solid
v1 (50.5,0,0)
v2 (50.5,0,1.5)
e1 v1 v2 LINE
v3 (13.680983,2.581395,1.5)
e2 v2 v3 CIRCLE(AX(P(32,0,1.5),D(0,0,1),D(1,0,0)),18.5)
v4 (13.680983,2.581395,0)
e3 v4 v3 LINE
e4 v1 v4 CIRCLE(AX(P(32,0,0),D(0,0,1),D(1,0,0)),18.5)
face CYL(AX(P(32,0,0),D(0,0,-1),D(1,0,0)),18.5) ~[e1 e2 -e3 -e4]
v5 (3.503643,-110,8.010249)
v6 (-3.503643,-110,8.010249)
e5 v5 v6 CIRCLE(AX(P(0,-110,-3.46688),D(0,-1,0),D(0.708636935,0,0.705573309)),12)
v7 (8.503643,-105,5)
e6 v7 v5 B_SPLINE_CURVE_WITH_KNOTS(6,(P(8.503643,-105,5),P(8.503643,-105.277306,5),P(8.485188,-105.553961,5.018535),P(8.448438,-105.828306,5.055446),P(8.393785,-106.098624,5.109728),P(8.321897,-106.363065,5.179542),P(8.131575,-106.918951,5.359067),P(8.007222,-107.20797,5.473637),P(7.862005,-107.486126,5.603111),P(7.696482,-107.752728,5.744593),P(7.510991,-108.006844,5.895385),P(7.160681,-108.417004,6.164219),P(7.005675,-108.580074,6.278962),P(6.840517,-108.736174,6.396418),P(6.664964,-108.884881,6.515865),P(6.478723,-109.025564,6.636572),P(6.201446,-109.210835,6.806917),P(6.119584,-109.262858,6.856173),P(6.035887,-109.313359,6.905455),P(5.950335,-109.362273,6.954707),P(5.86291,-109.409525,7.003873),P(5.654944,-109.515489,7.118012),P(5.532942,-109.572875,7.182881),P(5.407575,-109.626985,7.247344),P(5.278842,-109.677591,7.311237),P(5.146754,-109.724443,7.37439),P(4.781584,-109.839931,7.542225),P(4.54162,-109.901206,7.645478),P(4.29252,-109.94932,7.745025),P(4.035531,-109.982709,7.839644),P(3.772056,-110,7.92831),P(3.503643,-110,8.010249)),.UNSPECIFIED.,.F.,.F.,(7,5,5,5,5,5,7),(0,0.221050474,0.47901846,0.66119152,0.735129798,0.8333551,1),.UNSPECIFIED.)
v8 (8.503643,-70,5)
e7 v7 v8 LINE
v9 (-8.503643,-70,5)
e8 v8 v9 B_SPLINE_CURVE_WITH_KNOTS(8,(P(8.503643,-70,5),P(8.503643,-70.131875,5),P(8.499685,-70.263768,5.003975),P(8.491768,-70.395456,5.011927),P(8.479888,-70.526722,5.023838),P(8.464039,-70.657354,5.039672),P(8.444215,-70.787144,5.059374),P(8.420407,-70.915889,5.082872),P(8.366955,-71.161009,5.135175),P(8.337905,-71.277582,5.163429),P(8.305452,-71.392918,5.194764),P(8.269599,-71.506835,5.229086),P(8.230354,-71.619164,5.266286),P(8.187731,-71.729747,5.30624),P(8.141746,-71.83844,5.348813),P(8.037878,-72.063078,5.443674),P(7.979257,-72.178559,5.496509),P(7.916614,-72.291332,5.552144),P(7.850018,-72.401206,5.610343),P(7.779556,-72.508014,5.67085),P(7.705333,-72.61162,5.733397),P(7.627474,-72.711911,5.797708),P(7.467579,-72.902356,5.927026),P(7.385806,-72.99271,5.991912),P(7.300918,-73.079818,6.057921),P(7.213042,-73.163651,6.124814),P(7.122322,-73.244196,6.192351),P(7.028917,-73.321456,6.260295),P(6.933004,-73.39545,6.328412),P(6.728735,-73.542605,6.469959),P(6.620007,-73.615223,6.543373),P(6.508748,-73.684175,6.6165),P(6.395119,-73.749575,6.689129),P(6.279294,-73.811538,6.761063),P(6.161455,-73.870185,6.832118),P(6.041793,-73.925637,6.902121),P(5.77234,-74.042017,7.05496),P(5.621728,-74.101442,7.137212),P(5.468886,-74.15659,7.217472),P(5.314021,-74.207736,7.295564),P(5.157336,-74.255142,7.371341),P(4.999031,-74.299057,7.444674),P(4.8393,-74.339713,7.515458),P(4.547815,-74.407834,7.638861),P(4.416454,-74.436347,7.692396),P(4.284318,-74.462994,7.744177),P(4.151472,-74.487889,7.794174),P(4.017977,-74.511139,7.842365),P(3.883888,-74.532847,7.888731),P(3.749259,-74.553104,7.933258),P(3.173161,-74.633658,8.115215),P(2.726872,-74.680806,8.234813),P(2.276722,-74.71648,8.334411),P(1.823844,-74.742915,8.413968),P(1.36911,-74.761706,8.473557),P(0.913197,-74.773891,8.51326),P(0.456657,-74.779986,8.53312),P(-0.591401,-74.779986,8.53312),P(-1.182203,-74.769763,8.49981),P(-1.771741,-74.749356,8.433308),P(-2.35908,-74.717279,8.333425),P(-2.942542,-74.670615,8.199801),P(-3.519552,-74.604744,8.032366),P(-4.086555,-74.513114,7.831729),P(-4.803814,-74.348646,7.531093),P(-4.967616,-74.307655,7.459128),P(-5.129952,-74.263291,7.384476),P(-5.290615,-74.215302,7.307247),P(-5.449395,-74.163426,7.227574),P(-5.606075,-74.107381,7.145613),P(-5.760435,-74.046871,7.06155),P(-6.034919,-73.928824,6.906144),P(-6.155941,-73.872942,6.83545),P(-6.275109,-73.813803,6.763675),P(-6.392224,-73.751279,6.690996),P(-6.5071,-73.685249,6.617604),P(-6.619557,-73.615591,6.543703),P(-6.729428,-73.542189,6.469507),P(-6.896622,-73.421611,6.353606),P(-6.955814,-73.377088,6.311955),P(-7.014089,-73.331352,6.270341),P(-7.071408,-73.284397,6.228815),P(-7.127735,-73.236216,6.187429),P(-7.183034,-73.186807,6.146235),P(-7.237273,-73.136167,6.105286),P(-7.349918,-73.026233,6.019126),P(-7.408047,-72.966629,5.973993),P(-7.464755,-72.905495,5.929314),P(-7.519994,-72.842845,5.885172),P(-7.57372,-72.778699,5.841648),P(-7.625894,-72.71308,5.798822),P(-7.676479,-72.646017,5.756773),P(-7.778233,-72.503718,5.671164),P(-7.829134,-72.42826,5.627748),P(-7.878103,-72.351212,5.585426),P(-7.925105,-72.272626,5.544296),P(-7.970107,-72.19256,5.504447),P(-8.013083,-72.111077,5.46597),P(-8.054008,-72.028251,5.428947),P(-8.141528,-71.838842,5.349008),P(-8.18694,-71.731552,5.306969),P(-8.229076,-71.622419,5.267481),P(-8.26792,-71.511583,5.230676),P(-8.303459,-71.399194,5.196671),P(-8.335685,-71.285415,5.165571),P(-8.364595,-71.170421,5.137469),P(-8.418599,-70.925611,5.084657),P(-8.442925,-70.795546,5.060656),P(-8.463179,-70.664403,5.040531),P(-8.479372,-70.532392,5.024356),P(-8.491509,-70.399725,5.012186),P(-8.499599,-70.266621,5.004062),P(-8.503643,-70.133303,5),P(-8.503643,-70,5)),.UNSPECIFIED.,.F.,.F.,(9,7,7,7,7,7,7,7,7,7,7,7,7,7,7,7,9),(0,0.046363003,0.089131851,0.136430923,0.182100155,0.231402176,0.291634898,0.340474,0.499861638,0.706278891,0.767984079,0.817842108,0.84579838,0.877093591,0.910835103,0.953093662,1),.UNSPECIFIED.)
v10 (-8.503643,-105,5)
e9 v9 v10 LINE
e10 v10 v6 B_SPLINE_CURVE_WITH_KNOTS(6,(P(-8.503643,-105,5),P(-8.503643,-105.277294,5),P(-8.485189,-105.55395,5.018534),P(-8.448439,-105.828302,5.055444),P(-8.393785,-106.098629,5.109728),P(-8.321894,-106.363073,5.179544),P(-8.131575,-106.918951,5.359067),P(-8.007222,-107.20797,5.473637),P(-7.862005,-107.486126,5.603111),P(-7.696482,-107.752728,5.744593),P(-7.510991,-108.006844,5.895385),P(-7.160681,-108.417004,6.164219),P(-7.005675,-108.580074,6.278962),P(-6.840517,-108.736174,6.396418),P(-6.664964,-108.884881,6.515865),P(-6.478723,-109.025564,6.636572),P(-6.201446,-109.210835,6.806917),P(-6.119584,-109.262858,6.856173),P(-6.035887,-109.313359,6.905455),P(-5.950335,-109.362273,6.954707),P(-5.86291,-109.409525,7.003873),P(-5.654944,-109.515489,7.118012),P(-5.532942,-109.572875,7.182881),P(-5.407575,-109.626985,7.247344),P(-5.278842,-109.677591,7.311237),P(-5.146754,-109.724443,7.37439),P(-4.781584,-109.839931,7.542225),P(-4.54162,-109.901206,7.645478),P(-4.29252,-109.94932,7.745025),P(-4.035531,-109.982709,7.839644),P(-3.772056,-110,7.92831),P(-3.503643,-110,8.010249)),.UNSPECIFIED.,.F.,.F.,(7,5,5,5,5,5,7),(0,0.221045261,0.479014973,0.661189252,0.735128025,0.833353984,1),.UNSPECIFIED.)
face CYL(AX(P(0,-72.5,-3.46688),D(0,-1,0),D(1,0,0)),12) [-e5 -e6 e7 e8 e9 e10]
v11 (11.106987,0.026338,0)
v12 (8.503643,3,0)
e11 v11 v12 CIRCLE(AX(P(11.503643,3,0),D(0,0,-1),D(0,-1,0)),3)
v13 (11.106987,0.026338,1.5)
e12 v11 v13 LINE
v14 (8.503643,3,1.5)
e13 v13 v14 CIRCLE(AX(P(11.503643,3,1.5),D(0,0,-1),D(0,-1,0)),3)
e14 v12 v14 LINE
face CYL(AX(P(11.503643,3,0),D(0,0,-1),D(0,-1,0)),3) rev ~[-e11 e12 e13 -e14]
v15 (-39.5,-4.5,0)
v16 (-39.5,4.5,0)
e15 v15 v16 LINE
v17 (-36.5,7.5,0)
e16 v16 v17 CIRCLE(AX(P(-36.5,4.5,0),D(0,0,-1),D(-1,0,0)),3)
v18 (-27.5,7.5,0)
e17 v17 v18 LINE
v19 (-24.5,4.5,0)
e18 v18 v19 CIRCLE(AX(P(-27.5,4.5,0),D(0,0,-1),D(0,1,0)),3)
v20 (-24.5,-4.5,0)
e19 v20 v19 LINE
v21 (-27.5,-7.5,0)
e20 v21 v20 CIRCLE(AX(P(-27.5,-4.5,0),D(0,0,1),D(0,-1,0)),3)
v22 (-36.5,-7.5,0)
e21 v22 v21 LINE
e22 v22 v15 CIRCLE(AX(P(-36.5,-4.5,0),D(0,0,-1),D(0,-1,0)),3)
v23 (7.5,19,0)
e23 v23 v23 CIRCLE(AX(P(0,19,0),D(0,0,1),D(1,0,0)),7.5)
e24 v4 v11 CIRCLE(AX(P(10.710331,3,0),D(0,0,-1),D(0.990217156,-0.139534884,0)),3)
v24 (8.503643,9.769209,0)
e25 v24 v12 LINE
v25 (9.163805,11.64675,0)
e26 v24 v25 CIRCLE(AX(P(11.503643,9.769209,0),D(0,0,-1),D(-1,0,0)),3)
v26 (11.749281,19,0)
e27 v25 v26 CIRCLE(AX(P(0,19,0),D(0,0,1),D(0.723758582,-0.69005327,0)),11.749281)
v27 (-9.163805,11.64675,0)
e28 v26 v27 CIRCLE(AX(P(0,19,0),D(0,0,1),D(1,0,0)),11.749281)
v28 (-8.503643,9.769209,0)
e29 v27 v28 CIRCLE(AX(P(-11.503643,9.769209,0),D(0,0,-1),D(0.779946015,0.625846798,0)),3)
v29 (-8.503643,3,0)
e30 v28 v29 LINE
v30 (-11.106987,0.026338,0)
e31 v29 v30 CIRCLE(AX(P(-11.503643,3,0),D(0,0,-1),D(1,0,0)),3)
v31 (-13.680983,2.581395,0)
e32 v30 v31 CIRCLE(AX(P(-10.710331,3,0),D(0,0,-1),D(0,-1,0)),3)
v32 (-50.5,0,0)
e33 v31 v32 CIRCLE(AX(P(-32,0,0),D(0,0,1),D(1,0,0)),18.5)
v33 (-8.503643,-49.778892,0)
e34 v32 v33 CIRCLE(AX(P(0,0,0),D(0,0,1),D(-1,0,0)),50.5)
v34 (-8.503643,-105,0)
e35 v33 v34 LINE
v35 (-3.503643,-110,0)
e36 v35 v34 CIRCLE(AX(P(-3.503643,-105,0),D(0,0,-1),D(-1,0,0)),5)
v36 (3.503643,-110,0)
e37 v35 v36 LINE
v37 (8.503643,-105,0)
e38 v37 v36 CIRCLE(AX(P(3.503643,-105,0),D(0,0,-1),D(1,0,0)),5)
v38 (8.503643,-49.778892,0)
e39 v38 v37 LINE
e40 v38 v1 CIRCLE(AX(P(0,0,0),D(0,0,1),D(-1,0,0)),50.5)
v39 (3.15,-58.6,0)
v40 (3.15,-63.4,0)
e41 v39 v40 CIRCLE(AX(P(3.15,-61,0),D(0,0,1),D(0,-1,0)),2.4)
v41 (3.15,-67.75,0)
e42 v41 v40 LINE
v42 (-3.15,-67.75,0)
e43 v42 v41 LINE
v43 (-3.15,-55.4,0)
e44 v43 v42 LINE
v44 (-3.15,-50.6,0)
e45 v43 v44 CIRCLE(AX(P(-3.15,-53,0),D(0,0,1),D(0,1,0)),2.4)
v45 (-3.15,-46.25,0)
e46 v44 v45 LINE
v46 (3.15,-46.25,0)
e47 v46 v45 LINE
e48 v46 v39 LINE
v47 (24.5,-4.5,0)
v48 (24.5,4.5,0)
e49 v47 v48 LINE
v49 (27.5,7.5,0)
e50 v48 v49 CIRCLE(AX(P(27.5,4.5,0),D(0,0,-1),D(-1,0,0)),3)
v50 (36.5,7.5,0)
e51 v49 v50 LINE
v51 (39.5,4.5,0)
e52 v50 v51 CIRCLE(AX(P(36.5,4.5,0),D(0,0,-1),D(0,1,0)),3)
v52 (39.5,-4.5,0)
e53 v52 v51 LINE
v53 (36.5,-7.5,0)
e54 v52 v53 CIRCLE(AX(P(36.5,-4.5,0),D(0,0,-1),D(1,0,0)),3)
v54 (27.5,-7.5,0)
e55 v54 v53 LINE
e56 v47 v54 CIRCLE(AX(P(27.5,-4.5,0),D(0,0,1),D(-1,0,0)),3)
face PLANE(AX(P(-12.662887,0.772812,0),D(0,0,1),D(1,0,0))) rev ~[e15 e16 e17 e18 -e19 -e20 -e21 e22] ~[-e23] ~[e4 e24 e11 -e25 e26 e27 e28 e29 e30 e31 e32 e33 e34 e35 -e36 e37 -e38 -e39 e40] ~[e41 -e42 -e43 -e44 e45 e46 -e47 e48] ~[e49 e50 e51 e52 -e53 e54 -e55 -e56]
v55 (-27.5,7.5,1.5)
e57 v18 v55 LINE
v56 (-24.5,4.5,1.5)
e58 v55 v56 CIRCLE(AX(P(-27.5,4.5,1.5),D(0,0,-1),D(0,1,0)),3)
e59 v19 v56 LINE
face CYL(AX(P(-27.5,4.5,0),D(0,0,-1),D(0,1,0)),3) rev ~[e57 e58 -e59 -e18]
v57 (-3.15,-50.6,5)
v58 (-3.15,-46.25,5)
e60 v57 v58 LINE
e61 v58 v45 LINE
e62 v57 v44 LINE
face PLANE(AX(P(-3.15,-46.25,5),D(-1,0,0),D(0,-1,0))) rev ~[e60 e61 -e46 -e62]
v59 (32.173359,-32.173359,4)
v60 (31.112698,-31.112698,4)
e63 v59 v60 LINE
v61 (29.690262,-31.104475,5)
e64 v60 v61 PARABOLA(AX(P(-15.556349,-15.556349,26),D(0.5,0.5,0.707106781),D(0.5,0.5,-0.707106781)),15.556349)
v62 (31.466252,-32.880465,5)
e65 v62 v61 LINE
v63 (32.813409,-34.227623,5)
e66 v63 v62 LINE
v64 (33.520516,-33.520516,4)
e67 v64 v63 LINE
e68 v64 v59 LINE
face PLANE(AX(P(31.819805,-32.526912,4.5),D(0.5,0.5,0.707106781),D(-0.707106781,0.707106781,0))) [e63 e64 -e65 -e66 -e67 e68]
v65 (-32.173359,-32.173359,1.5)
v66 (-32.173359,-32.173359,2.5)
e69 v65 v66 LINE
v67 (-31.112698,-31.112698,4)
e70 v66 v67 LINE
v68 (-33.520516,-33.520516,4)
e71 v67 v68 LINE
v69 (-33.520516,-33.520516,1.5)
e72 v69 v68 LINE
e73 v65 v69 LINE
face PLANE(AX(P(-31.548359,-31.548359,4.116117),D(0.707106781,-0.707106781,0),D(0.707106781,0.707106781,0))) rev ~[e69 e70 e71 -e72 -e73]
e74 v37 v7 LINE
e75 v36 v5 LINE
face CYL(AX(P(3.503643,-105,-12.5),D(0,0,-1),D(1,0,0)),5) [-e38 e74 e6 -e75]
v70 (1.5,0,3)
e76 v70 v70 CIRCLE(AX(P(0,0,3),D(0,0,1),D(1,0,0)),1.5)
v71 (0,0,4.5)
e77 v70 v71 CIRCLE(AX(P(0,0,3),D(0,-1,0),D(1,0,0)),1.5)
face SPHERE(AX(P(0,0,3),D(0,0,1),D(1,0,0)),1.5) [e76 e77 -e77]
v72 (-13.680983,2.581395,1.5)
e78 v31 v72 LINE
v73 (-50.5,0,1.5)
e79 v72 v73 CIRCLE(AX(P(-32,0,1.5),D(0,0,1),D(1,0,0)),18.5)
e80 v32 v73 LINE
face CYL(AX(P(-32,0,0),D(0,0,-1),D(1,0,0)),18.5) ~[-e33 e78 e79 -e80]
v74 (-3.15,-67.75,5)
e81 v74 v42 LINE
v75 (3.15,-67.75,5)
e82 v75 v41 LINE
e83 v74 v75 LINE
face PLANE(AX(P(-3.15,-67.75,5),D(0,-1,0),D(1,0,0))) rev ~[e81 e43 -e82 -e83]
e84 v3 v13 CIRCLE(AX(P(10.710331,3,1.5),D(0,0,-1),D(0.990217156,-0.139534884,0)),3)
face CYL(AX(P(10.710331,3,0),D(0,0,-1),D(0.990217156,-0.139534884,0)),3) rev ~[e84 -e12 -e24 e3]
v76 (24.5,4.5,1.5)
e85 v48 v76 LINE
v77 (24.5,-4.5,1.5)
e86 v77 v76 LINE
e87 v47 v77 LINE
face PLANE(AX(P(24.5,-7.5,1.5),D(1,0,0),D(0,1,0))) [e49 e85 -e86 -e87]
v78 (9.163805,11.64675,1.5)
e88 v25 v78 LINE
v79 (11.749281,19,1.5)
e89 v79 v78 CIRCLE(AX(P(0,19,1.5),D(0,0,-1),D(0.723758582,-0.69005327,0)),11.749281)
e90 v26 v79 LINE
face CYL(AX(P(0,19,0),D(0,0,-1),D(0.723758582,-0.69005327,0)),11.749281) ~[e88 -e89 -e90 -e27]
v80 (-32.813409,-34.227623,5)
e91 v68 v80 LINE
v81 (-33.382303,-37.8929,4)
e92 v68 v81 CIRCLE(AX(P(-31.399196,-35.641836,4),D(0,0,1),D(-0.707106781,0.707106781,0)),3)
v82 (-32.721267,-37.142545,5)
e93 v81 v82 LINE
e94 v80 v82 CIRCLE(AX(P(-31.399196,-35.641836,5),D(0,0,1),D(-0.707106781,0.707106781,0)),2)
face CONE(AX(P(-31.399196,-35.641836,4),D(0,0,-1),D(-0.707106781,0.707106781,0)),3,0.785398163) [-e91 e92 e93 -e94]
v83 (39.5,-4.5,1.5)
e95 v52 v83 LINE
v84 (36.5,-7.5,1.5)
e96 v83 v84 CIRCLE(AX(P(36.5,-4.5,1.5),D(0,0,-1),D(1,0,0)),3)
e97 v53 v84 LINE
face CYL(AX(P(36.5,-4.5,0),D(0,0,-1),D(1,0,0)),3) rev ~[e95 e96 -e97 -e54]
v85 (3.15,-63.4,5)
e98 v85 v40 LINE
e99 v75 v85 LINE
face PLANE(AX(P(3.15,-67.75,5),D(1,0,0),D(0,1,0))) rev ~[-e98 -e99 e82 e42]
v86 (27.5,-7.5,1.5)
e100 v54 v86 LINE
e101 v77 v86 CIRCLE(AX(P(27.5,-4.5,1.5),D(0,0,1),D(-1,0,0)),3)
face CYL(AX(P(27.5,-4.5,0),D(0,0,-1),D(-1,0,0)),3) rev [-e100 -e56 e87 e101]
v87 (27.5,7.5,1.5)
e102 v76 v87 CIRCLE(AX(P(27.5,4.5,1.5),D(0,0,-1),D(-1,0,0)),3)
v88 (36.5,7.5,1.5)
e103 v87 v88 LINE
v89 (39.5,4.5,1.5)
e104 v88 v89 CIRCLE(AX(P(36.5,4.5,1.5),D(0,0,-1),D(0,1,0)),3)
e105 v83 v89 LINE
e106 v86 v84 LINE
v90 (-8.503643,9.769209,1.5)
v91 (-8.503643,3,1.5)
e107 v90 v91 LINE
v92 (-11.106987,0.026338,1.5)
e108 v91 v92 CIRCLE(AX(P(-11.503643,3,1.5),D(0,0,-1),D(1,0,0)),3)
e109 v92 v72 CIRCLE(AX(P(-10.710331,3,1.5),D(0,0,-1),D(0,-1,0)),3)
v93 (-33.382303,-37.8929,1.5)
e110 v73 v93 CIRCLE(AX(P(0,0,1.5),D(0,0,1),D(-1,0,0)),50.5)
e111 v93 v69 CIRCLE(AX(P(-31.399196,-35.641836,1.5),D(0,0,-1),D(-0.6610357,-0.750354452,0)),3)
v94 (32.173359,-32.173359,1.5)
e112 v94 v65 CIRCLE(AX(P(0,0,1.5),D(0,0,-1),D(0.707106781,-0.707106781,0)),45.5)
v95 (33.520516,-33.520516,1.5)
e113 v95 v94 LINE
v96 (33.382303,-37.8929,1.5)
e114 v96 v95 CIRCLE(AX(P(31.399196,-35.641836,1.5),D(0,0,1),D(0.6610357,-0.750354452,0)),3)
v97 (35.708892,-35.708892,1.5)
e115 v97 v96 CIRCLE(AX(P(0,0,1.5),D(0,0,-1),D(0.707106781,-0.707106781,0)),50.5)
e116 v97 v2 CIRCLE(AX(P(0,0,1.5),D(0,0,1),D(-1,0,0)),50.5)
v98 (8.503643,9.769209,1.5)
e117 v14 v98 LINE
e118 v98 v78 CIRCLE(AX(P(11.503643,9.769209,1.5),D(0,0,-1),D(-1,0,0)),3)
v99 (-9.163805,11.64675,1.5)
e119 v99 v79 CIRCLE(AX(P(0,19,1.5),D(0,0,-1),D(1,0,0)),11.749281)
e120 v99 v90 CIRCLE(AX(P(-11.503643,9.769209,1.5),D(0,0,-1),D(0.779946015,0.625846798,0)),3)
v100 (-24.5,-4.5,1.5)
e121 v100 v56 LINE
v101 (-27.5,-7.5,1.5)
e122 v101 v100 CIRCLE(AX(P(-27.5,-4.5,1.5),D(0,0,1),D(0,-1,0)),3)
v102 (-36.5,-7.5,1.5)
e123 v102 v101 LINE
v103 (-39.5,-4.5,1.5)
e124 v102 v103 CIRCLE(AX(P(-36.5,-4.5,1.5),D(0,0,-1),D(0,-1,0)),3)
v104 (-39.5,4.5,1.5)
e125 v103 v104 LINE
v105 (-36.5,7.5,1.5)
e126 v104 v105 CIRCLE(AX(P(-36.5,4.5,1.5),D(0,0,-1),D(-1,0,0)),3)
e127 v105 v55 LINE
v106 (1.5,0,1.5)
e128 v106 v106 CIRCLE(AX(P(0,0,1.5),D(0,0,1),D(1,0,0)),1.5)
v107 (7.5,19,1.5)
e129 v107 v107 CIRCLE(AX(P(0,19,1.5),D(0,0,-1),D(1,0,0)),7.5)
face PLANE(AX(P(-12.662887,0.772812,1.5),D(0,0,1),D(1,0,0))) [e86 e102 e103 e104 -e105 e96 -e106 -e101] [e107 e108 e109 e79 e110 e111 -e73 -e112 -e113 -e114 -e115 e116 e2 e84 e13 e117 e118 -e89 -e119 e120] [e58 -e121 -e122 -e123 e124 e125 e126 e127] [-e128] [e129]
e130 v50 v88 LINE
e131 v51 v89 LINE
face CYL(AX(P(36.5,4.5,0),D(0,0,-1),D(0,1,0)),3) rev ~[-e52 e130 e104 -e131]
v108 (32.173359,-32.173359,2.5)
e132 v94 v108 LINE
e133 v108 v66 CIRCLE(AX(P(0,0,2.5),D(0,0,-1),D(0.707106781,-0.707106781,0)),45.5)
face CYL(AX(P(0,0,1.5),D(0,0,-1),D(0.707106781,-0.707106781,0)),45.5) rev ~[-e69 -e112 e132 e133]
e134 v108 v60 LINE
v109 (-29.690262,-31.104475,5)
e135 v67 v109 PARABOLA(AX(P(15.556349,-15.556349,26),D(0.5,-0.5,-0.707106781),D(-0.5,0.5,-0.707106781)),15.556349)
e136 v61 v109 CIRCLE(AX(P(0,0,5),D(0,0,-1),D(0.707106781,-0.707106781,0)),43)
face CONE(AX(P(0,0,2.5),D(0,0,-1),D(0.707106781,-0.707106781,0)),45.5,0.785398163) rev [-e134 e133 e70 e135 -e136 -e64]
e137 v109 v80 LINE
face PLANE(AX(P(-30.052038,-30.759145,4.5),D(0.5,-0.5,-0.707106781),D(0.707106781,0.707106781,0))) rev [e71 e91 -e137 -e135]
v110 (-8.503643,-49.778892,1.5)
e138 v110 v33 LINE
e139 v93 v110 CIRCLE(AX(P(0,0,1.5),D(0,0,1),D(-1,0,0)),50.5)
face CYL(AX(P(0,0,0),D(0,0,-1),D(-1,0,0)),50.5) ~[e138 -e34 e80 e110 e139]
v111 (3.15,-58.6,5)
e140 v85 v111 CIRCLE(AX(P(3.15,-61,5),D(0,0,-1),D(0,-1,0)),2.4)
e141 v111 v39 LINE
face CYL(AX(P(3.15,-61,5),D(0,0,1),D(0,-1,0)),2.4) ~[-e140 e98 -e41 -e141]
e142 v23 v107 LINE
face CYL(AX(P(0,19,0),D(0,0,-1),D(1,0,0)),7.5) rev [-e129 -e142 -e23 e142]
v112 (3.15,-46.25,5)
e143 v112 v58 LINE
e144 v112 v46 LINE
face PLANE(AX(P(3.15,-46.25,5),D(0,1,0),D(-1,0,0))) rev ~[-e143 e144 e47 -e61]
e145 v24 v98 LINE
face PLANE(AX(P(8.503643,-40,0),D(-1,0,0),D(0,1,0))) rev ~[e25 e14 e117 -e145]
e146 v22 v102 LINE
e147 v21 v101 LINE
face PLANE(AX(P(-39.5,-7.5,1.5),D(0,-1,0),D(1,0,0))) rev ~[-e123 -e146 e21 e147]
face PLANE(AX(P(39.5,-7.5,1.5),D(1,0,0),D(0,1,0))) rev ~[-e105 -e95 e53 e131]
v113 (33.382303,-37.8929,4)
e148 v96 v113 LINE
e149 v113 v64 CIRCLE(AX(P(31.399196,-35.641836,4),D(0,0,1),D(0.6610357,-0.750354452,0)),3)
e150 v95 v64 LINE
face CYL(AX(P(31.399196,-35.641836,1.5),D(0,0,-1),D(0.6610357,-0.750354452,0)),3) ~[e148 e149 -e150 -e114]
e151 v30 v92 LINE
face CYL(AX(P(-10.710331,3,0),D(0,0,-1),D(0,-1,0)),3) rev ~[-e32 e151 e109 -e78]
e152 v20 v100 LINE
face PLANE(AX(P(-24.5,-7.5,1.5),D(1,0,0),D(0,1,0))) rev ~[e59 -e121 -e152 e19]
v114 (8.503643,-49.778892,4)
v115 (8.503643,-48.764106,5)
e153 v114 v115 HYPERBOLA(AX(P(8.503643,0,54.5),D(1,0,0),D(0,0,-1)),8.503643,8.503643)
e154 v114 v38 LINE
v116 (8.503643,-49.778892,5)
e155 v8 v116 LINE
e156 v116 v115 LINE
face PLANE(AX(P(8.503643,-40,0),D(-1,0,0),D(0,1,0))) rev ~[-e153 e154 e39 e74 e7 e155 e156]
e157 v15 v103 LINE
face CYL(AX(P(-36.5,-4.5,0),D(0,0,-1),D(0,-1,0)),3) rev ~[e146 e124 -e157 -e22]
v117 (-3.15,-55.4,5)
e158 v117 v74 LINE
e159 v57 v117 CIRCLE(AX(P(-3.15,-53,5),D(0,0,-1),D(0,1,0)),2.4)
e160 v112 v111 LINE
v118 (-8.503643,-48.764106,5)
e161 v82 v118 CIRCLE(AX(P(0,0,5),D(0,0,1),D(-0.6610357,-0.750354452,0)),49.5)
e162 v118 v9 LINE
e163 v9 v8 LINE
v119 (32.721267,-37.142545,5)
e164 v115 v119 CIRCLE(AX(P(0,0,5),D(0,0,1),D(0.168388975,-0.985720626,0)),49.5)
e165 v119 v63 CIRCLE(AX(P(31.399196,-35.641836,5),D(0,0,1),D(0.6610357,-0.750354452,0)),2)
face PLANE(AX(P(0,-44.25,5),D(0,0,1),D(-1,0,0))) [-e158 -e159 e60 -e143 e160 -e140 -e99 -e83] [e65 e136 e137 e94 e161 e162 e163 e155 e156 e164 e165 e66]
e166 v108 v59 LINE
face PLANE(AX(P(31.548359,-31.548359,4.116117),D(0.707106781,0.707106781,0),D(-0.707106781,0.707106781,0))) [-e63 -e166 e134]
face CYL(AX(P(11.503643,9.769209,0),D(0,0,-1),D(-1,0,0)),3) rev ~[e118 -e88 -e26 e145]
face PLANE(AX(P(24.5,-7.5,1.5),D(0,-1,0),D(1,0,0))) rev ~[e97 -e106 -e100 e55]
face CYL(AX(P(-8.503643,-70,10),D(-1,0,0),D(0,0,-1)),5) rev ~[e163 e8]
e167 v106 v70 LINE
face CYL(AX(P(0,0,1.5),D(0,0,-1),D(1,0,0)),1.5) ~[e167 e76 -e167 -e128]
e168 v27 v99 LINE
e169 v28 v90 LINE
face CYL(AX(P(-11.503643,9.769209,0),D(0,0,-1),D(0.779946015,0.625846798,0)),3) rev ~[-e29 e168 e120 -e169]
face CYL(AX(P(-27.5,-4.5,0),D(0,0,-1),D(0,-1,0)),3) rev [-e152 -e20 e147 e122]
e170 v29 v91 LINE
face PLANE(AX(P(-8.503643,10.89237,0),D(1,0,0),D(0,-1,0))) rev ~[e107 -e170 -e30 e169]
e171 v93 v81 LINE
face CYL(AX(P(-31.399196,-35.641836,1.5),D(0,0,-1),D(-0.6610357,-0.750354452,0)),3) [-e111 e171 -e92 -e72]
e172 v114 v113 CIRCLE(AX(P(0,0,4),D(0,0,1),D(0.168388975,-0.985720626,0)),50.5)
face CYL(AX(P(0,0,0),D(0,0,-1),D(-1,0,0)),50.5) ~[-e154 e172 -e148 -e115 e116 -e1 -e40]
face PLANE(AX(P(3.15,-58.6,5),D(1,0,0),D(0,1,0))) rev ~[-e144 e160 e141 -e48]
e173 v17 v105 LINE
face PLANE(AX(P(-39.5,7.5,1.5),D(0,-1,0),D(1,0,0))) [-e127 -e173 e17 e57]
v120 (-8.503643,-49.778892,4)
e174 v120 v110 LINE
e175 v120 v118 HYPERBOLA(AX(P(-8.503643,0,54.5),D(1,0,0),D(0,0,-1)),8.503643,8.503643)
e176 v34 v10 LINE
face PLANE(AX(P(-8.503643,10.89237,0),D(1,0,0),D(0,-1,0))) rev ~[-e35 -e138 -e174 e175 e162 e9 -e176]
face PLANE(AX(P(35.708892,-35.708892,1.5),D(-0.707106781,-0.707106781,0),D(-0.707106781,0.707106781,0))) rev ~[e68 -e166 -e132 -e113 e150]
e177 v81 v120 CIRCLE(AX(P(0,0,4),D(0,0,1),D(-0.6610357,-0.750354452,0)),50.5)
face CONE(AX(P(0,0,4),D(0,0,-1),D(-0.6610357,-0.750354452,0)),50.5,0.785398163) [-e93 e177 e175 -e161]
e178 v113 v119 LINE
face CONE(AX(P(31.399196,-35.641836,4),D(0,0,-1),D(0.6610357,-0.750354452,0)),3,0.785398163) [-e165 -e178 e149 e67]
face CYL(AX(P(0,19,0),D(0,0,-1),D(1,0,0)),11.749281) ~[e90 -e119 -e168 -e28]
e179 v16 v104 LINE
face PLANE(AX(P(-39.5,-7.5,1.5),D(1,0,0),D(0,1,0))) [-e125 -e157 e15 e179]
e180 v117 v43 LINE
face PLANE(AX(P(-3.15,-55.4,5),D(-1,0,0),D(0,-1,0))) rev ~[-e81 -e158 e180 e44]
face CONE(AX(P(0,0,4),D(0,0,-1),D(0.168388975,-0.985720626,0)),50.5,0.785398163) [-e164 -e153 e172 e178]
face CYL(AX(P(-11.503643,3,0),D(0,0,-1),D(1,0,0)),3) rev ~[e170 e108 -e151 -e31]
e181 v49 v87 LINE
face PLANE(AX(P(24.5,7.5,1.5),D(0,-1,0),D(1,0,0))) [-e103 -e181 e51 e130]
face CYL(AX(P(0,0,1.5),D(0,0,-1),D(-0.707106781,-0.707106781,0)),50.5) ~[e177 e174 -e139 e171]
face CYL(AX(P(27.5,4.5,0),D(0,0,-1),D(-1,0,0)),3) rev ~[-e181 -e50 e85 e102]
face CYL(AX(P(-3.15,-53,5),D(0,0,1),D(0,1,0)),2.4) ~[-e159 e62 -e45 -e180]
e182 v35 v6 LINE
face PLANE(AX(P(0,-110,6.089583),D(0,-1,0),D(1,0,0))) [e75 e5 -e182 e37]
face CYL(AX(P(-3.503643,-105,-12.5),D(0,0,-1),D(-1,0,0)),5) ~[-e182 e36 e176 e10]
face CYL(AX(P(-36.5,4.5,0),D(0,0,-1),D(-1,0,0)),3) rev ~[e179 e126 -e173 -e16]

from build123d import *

# Parameters (mm, degrees)
F1_DEPTH     = 5
F3_DEPTH     = 5.001
F5_DEPTH     = 35
F6_T4_DEPTH  = 17.0072864353
F6_S5_R      = 12
F6_T6_DEPTH  = 11
F6_T7_DEPTH  = 30
F7_R         = 7.5
F8_DEPTH     = 5
F9_R         = 45.5
F10_DEPTH    = 3.5
F12_DEPTH    = 1.5
F14_DEPTH    = 3.5
F18_W        = 15
F18_H        = 15
F19_DEPTH    = 1.5010001
F20_DEPTH    = 5.0010001
F21_R        = 1.5
F22_DEPTH    = 3
F23_T1_DEPTH = 1.5
F23_T3_DEPTH = 11.4776669635
F24_R        = 1.5
F25_SIZE     = 1


# Not quite as in the source:
# - a fillet or chamfer that OpenCascade refuses, or shapes differently, is made with other operations: its cross-section is extruded or revolved along the edge and cut away or added
# - a feature names something its author has since deleted; it is built from what else it names


with BuildPart() as f1:
    # F0 (on Top) → F1 (new body)
    with BuildSketch(Plane.XY):
        Polygon((8.5036432176, -40), (-8.5036432176, -40), (-8.5036432176, -110), (0, -110), (8.5036432176, -110), align=None)
    extrude(amount=F1_DEPTH)

    # F2 (on face) → F3 (cut, through all)
    with BuildSketch(Plane.XY.offset(5)):
        with BuildLine():
            Line((-3.15, -67.75), (3.15, -67.75))
            Line((3.15, -67.75), (3.15, -63.4))
            ThreePointArc((3.15, -63.4), (0.75, -61), (3.15, -58.6))
            Line((3.15, -58.6), (3.15, -46.25))
            Line((3.15, -46.25), (-3.15, -46.25))
            Line((-3.15, -46.25), (-3.15, -50.6))
            ThreePointArc((-3.15, -50.6), (-0.75, -53), (-3.15, -55.4))
            Line((-3.15, -55.4), (-3.15, -67.75))
        make_face()
    extrude(amount=-F3_DEPTH, mode=Mode.SUBTRACT)

    # F4 (on face) → F5 (join)
    with BuildSketch(Plane.XZ.offset(110)):
        with BuildLine():
            ThreePointArc((8.5036432176, 5), (0, 8.5331202898), (-8.5036432176, 5))
            Line((-8.5036432176, 5), (8.5036432176, 5))
        make_face()
    extrude(amount=-F5_DEPTH)

    # F6: fillet of radius 5 on 3 edges, made by hand


with BuildPart() as f6_tool2:
    # F6_s3 → F6_t4 (new body)
    with BuildSketch(Plane.YZ.offset(-8.5036432176)):
        with BuildLine():
            ThreePointArc((-70, 5), (-73.5355339059, 6.4644660941), (-75, 10))
            Line((-75, 10), (-75, 5))
            Line((-75, 5), (-70, 5))
        make_face()
    extrude(amount=F6_T4_DEPTH)

    # F6_s5 → F6_t6 (intersect, symmetric)
    with BuildSketch(Plane.XZ.offset(72.5)):
        with Locations((0, -3.4668797102)):
            Circle(F6_S5_R)
    extrude(amount=F6_T6_DEPTH, both=True, mode=Mode.INTERSECT)


with BuildPart() as f1_1:
    add(f1.part)

    # F6_t1: union F6_tool2
    add(f6_tool2.part)

    # F6_s8 → F6_t7 (cut)
    with BuildSketch(Plane.XY.offset(-12.5)):
        with BuildLine():
            ThreePointArc((-8.5036432176, -105), (-7.0391771236, -108.5355339059), (-3.5036432176, -110))
            Line((-3.5036432176, -110), (-8.5036432176, -110))
            Line((-8.5036432176, -110), (-8.5036432176, -105))
        make_face()
        with BuildLine():
            ThreePointArc((8.5036432176, -105), (7.0391771236, -108.5355339059), (3.5036432176, -110))
            Line((3.5036432176, -110), (8.5036432176, -110))
            Line((8.5036432176, -110), (8.5036432176, -105))
        make_face()
    extrude(amount=F6_T7_DEPTH, mode=Mode.SUBTRACT)

    # F7 (on Top) → F8 (join)
    with BuildSketch(Plane.XY):
        with BuildLine():
            Line((-8.5036432176, 0), (-8.5036432176, -40))
            Line((-8.5036432176, -40), (8.5036432176, -40))
            Line((8.5036432176, -40), (8.5036432176, 0))
            Line((8.5036432176, 0), (8.5036432176, 10.8923699759))
            ThreePointArc((8.5036432176, 10.8923699759), (0, 7.2507186355), (-8.5036432176, 10.8923699759))
            Line((-8.5036432176, 10.8923699759), (-8.5036432176, 0))
        make_face()
        with BuildLine():
            ThreePointArc((11.7492813645, 19), (-4.3665727862, 29.9077337098), (-8.5036432176, 10.8923699759))
            ThreePointArc((-8.5036432176, 10.8923699759), (0, 7.2507186355), (8.5036432176, 10.8923699759))
            ThreePointArc((8.5036432176, 10.8923699759), (10.9077337098, 14.6334272138), (11.7492813645, 19))
        make_face()
        with Locations((0, 19)):
            Circle(F7_R, mode=Mode.SUBTRACT)
    extrude(amount=F8_DEPTH)

    # F9 (on face) → F10 (cut)
    with BuildSketch(Plane.XY.offset(5)):
        Circle(F9_R)
    extrude(amount=-F10_DEPTH, mode=Mode.SUBTRACT)

    # F11 (on Top) → F12 (join)
    with BuildSketch(Plane.XY):
        with BuildLine():
            ThreePointArc((-13.5, 0), (-32, 18.5), (-50.5, 0))
            ThreePointArc((-50.5, 0), (0, -50.5), (50.5, 0))
            ThreePointArc((50.5, 0), (32, 18.5), (13.5, 0))
            Line((13.5, 0), (-13.5, 0))
        make_face()
    extrude(amount=F12_DEPTH)

    # F13 (on face) → F14 (join)
    with BuildSketch(Plane.XY.offset(1.5)):
        with BuildLine():
            ThreePointArc((32.173358544, -32.173358544), (0, -45.5), (-32.173358544, -32.173358544))
            Line((-32.173358544, -32.173358544), (-35.7088924499, -35.7088924499))
            ThreePointArc((-35.7088924499, -35.7088924499), (0, -50.5), (35.7088924499, -35.7088924499))
            Line((35.7088924499, -35.7088924499), (32.173358544, -32.173358544))
        make_face()
    extrude(amount=F14_DEPTH)

    # F17: sweep along a path in F17_path
    with BuildLine(Plane(origin=(32.173358544, -32.173358544, 5), x_dir=(0, 1, 0), z_dir=(0, 0, 1))) as f17_path:
        ThreePointArc((0, 0), (-13.326641456, 32.173358544), (0, 64.346717088))
    # F16 (on face) → F17 (sweep)
    with BuildSketch(Plane(origin=(0, 0, 0), x_dir=(0.7071067812, 0.7071067812, 0), z_dir=(0.7071067812, -0.7071067812, 0))):
        Polygon((-43, 5), (-45.5, 5), (-45.5, 2.5), align=None)
    sweep(path=f17_path.line)

    # F18 (on face) → F19 (cut, through all)
    with BuildSketch(Plane.XY.offset(1.5)):
        with Locations((-32, 0)):
            Rectangle(F18_W, F18_H)
        with Locations((32, 0)):
            Rectangle(F18_W, F18_H)
    extrude(amount=-F19_DEPTH, mode=Mode.SUBTRACT)

    # F2 (on face) → F20 (cut, through all)
    with BuildSketch(Plane.XY.offset(5)):
        with BuildLine():
            Line((-3.15, -67.75), (3.15, -67.75))
            Line((3.15, -67.75), (3.15, -63.4))
            ThreePointArc((3.15, -63.4), (0.75, -61), (3.15, -58.6))
            Line((3.15, -58.6), (3.15, -46.25))
            Line((3.15, -46.25), (-3.15, -46.25))
            Line((-3.15, -46.25), (-3.15, -50.6))
            ThreePointArc((-3.15, -50.6), (-0.75, -53), (-3.15, -55.4))
            Line((-3.15, -55.4), (-3.15, -67.75))
        make_face()
    extrude(amount=-F20_DEPTH, mode=Mode.SUBTRACT)

    # F21 (on face) → F22 (join)
    with BuildSketch(Plane.XY.offset(1.5)):
        Circle(F21_R)
    extrude(amount=F22_DEPTH)

    # F23: fillet of radius 3 on 16 edges, made by hand

    # F23_s2 → F23_t1 (join)
    with BuildSketch(Plane.XY):
        with BuildLine():
            ThreePointArc((-10.710331144, 0), (-12.6780946011, 0.7355117627), (-13.6809826122, 2.5813953488))
            ThreePointArc((-13.6809826122, 2.5813953488), (-13.5453011177, 1.2938659758), (-13.5, 0))
            Line((-13.5, 0), (-10.710331144, 0))
        make_face()
        with BuildLine():
            ThreePointArc((13.6809826122, 2.5813953488), (12.6780946011, 0.7355117627), (10.710331144, 0))
            Line((10.710331144, 0), (13.5, 0))
            ThreePointArc((13.5, 0), (13.5453011177, 1.2938659758), (13.6809826122, 2.5813953488))
        make_face()
        with BuildLine():
            ThreePointArc((39.5, -4.5), (38.6213203436, -6.6213203436), (36.5, -7.5))
            Line((36.5, -7.5), (39.5, -7.5))
            Line((39.5, -7.5), (39.5, -4.5))
        make_face()
        with BuildLine():
            ThreePointArc((24.5, -4.5), (25.3786796564, -6.6213203436), (27.5, -7.5))
            Line((27.5, -7.5), (24.5, -7.5))
            Line((24.5, -7.5), (24.5, -4.5))
        make_face()
        with BuildLine():
            ThreePointArc((24.5, 4.5), (25.3786796564, 6.6213203436), (27.5, 7.5))
            Line((27.5, 7.5), (24.5, 7.5))
            Line((24.5, 7.5), (24.5, 4.5))
        make_face()
        with BuildLine():
            ThreePointArc((36.5, 7.5), (38.6213203436, 6.6213203436), (39.5, 4.5))
            Line((39.5, 4.5), (39.5, 7.5))
            Line((39.5, 7.5), (36.5, 7.5))
        make_face()
        with BuildLine():
            ThreePointArc((-27.5, 7.5), (-25.3786796564, 6.6213203436), (-24.5, 4.5))
            Line((-24.5, 4.5), (-24.5, 7.5))
            Line((-24.5, 7.5), (-27.5, 7.5))
        make_face()
        with BuildLine():
            ThreePointArc((-36.5, -7.5), (-38.6213203436, -6.6213203436), (-39.5, -4.5))
            Line((-39.5, -4.5), (-39.5, -7.5))
            Line((-39.5, -7.5), (-36.5, -7.5))
        make_face()
        with BuildLine():
            ThreePointArc((-27.5, -7.5), (-25.3786796564, -6.6213203436), (-24.5, -4.5))
            Line((-24.5, -4.5), (-24.5, -7.5))
            Line((-24.5, -7.5), (-27.5, -7.5))
        make_face()
        with BuildLine():
            ThreePointArc((-39.5, 4.5), (-38.6213203436, 6.6213203436), (-36.5, 7.5))
            Line((-36.5, 7.5), (-39.5, 7.5))
            Line((-39.5, 7.5), (-39.5, 4.5))
        make_face()
        with BuildLine():
            ThreePointArc((11.5036432176, 0), (9.3823228741, 0.8786796564), (8.5036432176, 3))
            Line((8.5036432176, 3), (8.5036432176, 0))
            Line((8.5036432176, 0), (11.5036432176, 0))
        make_face()
        with BuildLine():
            ThreePointArc((-8.5036432176, 3), (-9.3823228741, 0.8786796564), (-11.5036432176, 0))
            Line((-11.5036432176, 0), (-8.5036432176, 0))
            Line((-8.5036432176, 0), (-8.5036432176, 3))
        make_face()
        with BuildLine():
            ThreePointArc((-9.163805174, 11.6467498809), (-8.6734917967, 10.7643189961), (-8.5036432176, 9.7692094873))
            Line((-8.5036432176, 9.7692094873), (-8.5036432176, 10.8923699759))
            ThreePointArc((-8.5036432176, 10.8923699759), (-8.8417733192, 11.2625160968), (-9.163805174, 11.6467498809))
        make_face()
        with BuildLine():
            ThreePointArc((8.5036432176, 9.7692094873), (8.6734917967, 10.7643189961), (9.163805174, 11.6467498809))
            ThreePointArc((9.163805174, 11.6467498809), (8.8417733192, 11.2625160968), (8.5036432176, 10.8923699759))
            Line((8.5036432176, 10.8923699759), (8.5036432176, 9.7692094873))
        make_face()
    extrude(amount=F23_T1_DEPTH)

    # F23_s4 → F23_t3 (cut)
    with BuildSketch(Plane.XY.offset(1.5)):
        with BuildLine():
            ThreePointArc((33.382302863, -37.8928998041), (34.3976980488, -35.7366206113), (33.5205161058, -33.5205161058))
            Line((33.5205161058, -33.5205161058), (35.7088924499, -35.7088924499))
            ThreePointArc((35.7088924499, -35.7088924499), (34.5628527392, -36.8192777024), (33.382302863, -37.8928998041))
        make_face()
        with BuildLine():
            ThreePointArc((-33.382302863, -37.8928998041), (-34.3976980488, -35.7366206113), (-33.5205161058, -33.5205161058))
            Line((-33.5205161058, -33.5205161058), (-35.7088924499, -35.7088924499))
            ThreePointArc((-35.7088924499, -35.7088924499), (-34.5628527392, -36.8192777024), (-33.382302863, -37.8928998041))
        make_face()
    extrude(amount=F23_T3_DEPTH, mode=Mode.SUBTRACT)

    # F24
    f24_edges = [f1_1.edges().sort_by_distance(p)[0] for p in [
        (-1.5, 0, 4.5),
    ]]
    fillet(f24_edges, radius=F24_R)

    # F25
    f25_edges = [f1_1.edges().sort_by_distance(p)[0] for p in [
        (21.769872, -45.566684, 5),
        (-21.769872, -45.566684, 5),
        (-34.397698, -35.736621, 5),
        (-31.963054, -31.963054, 5),
        (31.963054, -31.963054, 5),
        (34.397698, -35.736621, 5),
    ]]
    chamfer(f25_edges, length=F25_SIZE)


solid = f1_1.part
